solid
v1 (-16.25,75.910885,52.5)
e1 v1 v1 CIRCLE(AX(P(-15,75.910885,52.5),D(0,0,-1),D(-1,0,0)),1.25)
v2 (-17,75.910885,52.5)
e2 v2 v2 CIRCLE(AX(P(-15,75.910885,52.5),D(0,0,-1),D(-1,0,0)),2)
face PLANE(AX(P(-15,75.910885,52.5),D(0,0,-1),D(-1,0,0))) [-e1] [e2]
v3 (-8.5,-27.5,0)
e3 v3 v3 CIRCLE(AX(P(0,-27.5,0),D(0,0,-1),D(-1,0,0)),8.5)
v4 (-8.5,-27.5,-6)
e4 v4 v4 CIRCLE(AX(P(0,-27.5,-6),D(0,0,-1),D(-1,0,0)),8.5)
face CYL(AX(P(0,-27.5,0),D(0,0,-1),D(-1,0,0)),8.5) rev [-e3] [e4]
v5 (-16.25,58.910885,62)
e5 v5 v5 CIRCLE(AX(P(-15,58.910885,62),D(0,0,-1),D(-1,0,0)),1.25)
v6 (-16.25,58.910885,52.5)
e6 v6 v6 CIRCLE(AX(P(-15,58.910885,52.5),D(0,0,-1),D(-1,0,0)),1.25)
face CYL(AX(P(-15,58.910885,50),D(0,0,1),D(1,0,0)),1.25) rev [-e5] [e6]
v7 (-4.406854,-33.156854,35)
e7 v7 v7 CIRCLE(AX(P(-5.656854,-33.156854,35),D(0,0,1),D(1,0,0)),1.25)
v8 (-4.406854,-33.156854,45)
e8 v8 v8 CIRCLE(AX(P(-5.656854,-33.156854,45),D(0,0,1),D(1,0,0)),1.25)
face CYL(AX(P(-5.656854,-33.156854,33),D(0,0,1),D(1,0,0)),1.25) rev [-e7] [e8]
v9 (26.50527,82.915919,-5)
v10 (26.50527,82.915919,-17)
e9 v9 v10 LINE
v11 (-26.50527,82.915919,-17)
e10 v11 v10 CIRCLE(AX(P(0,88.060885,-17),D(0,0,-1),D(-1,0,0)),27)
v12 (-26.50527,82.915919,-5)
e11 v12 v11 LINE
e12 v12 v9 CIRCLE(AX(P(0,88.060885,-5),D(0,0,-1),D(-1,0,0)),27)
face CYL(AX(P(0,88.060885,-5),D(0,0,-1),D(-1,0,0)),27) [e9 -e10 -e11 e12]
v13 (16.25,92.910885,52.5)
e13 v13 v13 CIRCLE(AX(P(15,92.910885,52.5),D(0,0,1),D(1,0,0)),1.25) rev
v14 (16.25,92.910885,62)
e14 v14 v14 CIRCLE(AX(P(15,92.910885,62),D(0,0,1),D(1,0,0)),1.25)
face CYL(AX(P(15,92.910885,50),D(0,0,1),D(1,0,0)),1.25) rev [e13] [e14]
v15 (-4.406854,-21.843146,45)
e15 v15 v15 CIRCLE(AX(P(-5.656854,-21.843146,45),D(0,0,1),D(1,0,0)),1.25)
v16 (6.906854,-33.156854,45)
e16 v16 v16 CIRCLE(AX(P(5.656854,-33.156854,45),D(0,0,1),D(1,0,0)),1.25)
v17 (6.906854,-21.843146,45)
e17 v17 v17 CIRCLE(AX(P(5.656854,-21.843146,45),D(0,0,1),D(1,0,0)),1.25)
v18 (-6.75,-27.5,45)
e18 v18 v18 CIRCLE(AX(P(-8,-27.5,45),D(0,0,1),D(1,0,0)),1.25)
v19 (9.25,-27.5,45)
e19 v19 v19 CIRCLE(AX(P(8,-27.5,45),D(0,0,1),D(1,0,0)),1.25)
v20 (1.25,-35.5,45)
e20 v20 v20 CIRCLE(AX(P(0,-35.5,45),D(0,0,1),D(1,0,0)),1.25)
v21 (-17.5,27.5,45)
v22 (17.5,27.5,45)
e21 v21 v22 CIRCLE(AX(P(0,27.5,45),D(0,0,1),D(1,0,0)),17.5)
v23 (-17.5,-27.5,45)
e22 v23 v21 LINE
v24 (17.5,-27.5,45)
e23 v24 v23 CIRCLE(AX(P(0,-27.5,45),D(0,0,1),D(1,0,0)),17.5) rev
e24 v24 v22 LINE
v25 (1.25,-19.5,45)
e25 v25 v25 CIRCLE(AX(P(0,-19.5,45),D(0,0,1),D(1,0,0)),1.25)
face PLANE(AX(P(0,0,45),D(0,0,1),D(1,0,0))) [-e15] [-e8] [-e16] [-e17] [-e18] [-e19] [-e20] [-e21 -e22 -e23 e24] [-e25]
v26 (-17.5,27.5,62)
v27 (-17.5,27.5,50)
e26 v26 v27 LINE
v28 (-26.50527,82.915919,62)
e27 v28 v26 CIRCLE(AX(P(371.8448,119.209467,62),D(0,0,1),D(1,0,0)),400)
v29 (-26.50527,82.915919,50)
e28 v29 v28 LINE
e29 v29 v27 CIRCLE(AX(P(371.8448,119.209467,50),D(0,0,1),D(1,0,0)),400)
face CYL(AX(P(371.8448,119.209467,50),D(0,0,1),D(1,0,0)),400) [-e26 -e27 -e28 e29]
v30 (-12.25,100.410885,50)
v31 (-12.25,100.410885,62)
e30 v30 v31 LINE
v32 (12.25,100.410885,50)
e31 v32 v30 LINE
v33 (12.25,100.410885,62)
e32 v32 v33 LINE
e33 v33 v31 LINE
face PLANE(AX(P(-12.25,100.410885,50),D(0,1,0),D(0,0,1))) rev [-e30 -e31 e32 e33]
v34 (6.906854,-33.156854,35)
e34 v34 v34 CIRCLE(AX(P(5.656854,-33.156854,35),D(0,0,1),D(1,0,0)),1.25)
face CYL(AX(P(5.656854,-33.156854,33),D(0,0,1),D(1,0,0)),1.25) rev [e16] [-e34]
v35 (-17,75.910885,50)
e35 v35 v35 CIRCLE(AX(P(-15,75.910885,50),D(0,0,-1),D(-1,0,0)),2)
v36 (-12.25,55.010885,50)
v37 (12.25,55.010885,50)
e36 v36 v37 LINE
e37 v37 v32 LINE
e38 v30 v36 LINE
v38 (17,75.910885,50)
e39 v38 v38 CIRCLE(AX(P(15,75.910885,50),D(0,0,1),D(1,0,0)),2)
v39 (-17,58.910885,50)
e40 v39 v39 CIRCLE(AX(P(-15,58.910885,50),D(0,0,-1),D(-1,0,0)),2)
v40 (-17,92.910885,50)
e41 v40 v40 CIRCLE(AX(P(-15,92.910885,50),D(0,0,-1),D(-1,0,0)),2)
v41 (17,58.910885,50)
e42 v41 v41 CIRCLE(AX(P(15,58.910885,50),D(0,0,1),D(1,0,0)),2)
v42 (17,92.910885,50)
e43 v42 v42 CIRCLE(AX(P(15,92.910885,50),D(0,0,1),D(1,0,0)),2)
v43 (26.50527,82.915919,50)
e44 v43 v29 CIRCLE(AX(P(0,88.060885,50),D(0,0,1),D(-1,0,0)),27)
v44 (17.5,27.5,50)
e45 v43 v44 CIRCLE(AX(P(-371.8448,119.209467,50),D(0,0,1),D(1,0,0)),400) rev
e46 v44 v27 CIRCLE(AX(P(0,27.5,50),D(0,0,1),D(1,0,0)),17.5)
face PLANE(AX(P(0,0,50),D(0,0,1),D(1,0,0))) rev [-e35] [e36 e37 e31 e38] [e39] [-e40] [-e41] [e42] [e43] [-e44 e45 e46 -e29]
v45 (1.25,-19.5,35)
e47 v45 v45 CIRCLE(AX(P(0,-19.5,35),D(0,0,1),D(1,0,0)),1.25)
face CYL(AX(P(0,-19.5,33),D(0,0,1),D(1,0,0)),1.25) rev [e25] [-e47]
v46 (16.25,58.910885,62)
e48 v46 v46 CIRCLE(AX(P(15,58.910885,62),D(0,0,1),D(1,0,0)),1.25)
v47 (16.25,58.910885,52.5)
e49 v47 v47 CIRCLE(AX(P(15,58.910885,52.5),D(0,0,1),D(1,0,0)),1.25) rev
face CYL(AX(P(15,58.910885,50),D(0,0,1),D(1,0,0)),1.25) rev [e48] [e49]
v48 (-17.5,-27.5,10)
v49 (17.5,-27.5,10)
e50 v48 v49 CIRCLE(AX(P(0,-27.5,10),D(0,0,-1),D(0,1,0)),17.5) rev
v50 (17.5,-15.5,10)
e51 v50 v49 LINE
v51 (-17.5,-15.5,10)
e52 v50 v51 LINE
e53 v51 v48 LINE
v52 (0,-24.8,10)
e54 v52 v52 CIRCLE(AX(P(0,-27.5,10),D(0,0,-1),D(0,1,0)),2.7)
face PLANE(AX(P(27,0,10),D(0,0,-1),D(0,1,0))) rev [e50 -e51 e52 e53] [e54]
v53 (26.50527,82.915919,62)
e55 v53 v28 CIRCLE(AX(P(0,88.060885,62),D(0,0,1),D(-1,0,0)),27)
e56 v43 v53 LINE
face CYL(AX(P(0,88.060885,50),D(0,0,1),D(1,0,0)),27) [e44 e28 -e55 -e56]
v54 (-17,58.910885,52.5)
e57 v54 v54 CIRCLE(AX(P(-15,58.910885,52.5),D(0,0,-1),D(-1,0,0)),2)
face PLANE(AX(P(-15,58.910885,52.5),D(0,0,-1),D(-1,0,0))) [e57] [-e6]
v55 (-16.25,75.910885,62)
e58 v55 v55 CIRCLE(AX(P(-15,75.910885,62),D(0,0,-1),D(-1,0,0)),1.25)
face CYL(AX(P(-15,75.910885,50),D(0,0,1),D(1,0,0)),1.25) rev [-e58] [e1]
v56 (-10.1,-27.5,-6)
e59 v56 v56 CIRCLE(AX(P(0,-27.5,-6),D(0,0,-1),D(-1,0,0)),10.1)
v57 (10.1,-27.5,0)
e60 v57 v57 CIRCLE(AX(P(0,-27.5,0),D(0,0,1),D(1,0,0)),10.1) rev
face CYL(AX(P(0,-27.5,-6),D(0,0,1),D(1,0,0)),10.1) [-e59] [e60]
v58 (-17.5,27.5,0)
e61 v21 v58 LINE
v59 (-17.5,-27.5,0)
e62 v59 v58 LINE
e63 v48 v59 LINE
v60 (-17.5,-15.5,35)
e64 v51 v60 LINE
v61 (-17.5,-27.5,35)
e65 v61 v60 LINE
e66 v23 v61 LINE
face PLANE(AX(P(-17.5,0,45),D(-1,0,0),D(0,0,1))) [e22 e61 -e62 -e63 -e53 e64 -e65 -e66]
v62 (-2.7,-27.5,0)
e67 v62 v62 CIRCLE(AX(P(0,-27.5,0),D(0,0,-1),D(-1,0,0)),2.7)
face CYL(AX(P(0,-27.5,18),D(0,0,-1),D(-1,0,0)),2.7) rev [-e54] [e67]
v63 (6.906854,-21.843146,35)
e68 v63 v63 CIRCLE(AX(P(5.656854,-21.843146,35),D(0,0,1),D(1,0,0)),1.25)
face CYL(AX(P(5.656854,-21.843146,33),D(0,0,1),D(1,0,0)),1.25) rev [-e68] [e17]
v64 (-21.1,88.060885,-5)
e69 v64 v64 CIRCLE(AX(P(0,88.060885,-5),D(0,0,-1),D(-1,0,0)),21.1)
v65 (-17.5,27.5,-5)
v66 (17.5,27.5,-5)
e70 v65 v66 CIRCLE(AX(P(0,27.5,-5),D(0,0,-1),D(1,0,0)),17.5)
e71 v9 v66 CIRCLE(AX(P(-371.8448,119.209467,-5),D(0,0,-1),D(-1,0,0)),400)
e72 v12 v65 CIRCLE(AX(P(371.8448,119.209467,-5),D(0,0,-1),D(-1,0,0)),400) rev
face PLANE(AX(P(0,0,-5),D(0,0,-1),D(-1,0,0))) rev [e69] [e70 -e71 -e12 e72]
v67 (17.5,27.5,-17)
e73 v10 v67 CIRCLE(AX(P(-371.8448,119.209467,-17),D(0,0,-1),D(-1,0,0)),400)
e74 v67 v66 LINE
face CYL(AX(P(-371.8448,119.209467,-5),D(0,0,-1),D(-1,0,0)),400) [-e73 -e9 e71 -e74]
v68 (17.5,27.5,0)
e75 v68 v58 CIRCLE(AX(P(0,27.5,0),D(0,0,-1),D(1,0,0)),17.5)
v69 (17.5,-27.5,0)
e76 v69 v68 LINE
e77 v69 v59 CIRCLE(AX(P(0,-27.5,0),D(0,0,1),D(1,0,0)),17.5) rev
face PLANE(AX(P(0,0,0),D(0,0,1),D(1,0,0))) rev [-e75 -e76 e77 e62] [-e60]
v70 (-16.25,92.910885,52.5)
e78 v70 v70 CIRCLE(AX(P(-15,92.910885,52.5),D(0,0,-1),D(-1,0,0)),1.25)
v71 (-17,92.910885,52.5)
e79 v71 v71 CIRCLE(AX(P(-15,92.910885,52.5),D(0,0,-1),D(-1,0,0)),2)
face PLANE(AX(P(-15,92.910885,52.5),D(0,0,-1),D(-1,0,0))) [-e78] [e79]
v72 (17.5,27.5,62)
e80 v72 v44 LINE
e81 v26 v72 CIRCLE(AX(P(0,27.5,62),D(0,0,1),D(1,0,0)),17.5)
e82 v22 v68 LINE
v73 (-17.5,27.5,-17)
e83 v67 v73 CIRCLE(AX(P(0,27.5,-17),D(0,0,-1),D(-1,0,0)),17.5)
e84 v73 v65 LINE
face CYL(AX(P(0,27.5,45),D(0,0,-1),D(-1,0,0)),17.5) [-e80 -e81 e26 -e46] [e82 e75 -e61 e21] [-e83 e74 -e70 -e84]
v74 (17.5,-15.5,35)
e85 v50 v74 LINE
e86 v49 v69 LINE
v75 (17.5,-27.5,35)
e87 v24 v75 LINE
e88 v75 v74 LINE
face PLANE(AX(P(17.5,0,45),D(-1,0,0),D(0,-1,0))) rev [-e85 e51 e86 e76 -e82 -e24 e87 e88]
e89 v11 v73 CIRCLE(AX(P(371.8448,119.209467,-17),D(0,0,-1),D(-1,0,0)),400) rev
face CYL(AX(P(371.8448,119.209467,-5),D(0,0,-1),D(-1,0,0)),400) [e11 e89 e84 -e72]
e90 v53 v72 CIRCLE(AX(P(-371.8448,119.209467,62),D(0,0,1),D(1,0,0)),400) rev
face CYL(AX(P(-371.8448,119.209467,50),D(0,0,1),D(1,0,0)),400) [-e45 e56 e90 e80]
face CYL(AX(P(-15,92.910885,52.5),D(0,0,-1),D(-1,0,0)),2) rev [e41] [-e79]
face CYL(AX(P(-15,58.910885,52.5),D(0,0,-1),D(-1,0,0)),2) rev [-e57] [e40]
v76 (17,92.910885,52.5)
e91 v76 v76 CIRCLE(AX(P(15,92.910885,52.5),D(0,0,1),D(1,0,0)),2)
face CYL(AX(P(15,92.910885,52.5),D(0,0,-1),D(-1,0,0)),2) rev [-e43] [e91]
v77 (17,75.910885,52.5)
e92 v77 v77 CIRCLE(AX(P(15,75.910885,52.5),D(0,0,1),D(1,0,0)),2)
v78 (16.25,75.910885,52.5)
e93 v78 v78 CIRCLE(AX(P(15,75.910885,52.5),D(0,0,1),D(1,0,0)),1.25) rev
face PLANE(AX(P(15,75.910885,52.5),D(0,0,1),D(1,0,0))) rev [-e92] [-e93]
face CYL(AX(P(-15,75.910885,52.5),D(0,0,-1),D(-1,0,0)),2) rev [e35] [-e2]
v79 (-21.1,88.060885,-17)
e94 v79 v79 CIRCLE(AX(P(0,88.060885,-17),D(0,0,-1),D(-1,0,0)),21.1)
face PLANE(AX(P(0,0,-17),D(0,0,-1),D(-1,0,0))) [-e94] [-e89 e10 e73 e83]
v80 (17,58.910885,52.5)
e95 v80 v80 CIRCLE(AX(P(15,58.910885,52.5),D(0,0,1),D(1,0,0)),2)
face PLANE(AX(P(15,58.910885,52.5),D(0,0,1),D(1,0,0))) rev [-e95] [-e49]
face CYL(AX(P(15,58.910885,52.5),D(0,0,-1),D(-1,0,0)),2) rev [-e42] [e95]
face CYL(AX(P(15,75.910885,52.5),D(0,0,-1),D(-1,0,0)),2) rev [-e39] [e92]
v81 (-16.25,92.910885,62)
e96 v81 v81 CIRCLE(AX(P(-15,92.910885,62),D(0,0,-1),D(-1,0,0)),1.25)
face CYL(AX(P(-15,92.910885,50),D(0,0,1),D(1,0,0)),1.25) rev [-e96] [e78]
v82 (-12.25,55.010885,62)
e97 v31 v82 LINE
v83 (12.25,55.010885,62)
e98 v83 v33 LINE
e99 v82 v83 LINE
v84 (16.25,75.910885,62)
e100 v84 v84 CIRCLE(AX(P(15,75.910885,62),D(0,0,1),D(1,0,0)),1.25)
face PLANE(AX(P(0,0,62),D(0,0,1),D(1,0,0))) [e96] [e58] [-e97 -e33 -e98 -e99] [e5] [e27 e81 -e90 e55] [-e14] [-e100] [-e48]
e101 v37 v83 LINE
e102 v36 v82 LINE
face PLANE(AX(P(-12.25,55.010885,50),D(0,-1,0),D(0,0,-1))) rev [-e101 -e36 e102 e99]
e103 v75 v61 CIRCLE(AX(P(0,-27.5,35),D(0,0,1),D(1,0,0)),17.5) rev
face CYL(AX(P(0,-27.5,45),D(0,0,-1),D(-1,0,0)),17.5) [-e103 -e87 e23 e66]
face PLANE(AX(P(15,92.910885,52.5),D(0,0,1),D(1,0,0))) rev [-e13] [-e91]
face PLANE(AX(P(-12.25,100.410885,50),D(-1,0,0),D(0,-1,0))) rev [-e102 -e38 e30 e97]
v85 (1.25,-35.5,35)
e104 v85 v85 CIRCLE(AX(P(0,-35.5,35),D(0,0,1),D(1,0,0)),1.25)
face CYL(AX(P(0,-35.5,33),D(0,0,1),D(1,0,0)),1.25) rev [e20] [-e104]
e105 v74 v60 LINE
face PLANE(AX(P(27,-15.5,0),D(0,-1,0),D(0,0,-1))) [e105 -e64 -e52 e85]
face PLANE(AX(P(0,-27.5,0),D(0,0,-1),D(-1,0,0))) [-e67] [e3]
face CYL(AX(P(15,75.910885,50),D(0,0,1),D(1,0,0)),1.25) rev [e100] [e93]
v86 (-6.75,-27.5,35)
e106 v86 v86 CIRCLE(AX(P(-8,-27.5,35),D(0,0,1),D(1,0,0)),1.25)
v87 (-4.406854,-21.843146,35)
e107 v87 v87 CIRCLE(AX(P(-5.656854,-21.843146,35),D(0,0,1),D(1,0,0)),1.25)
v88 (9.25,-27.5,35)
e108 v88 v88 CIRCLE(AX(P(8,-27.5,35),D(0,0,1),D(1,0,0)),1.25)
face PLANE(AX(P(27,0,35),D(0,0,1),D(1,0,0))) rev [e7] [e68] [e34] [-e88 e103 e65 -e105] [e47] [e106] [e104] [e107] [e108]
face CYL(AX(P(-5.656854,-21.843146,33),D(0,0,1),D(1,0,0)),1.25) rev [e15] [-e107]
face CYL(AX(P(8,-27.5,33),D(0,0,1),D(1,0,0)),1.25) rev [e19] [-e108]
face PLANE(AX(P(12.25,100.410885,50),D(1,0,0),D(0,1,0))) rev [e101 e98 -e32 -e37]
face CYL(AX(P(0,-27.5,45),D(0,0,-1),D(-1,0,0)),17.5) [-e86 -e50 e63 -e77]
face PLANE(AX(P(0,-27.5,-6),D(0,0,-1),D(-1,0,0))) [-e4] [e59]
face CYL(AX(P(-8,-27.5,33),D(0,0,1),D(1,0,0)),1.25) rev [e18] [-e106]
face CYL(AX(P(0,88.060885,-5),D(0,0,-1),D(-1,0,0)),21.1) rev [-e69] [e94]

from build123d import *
from build123d.topology import SkipClean

# Parameters (mm, degrees)
BOSS_EXTRUDE1_DEPTH  = 45
BOSS_EXTRUDE2_DEPTH  = 5
BOSS_EXTRUDE3_DEPTH  = 12
BOSS_EXTRUDE4_START  = 5
BOSS_EXTRUDE4_DEPTH  = 5
BOSS_EXTRUDE5_START  = 12
BOSS_EXTRUDE5_DEPTH  = 12
BOSS_EXTRUDE6_START  = -12
BOSS_EXTRUDE6_DEPTH  = 12
BOSS_EXTRUDE7_DEPTH  = 12
CUT_EXTRUDE3_DEPTH   = 12
SKETCH15_R           = 21.100000000000012
CUT_EXTRUDE4_DEPTH   = 12
CUT_EXTRUDE5_DEPTH   = 139.06975520310718
SKETCH21_R           = 1.2500000000000013
SKETCH21_R_2         = 1.2500000000000016
SKETCH21_R_3         = 1.2500000000000036
SKETCH21_R_4         = 1.2500000000000064
SKETCH21_R_5         = 1.2500000000000004
SKETCH21_R_6         = 1.250000000000002
CUT_EXTRUDE7_DEPTH   = 12
SKETCH23_R           = 10.100000000000001
BOSS_EXTRUDE8_DEPTH  = 6
SKETCH24_R           = 8.5
CUT_EXTRUDE8_DEPTH   = 6
SKETCH25_R           = 2.7
CUT_EXTRUDE9_DEPTH   = 18
BOSS_EXTRUDE9_START  = -12
BOSS_EXTRUDE9_DEPTH  = 12
SKETCH30_R           = 1.2500000000000013
CUT_EXTRUDE11_DEPTH  = 12
SKETCH31_R           = 2.0000000000000036
SKETCH31_R_2         = 2.0000000000000067
SKETCH31_R_3         = 2
CUT_EXTRUDE12_DEPTH  = 2.5
BOSS_EXTRUDE11_DEPTH = 12


with BuildPart() as part:
    # Sketch2 → Boss-Extrude1 (new body)
    with BuildSketch(Plane.XY):
        with BuildLine():
            Line((-17.5, 27.5), (-17.5, -27.5))
            ThreePointArc((-17.5, -27.500000000000004), (3.74e-15, -45), (17.500000000000007, -27.5))
            Line((17.500000000000007, -27.5), (17.5, 27.5))
            ThreePointArc((17.5, 27.500000000000004), (7e-16, 45), (-17.5, 27.5))
        make_face()
    extrude(amount=BOSS_EXTRUDE1_DEPTH)

    # Sketch5 → Boss-Extrude2 (add)
    with BuildSketch(Plane.XY.offset(45)):
        with BuildLine():
            ThreePointArc((17.5, 27.5), (1.07e-15, 45), (-17.5, 27.5))
            ThreePointArc((-17.5, 27.5), (-3.21e-15, 10), (17.5, 27.5))
        make_face()
    extrude(amount=BOSS_EXTRUDE2_DEPTH)

    # Sketch6 → Boss-Extrude3 (add)
    with BuildSketch(Plane.XY.offset(49.99999999999999)):
        with BuildLine():
            Line((17.5, 27.5), (17.499999999999996, 67.5))
            ThreePointArc((17.499999999999996, 67.5), (-1.59e-15, 85), (-17.500000000000004, 67.5))
            Line((-17.5, 67.5), (-17.5, 27.5))
            ThreePointArc((-17.5, 27.5), (1.8e-16, 10.000000000000004), (17.5, 27.500000000000004))
        make_face()
    extrude(amount=BOSS_EXTRUDE3_DEPTH)

    # Sketch7 → Boss-Extrude4 (add)
    with BuildSketch(Plane(origin=(0, 0, 0), x_dir=(-1, 0, 0), z_dir=(0, 0, -1)).offset(BOSS_EXTRUDE4_START)):
        with BuildLine():
            ThreePointArc((17.5, 27.5), (1.07e-15, 10), (-17.5, 27.5))
            ThreePointArc((-17.5, 27.5), (1.07e-15, 45), (17.5, 27.5))
        make_face()
    extrude(amount=-BOSS_EXTRUDE4_DEPTH)

    # Sketch8 → Boss-Extrude5 (add)
    with BuildSketch(Plane(origin=(0, 0, -5), x_dir=(-1, 0, 0), z_dir=(0, 0, -1)).offset(BOSS_EXTRUDE5_START)):
        with BuildLine():
            Line((-17.499999999999996, 67.5), (-17.5, 27.5))
            ThreePointArc((-17.5, 27.5), (-1.96e-15, 10), (17.5, 27.499999999999996))
            Line((17.5, 27.5), (17.5, 67.5))
            ThreePointArc((17.5, 67.5), (1.96e-15, 85), (-17.5, 67.5))
        make_face()
    extrude(amount=-BOSS_EXTRUDE5_DEPTH)

    # Sketch11 → Boss-Extrude6 (add)
    with BuildSketch(Plane.XY.offset(62).offset(BOSS_EXTRUDE6_START)):
        with BuildLine():
            Line((-17.5, 67.5), (-17.5, 27.5))
            ThreePointArc((-17.5, 27.5), (-3.21e-15, 10), (17.5, 27.5))
            Line((17.5, 27.5), (17.499999999999996, 67.5))
            ThreePointArc((17.499999999999996, 67.5), (-6.69e-15, 115.06088519495209), (-17.5, 67.5))
        make_face()
    extrude(amount=BOSS_EXTRUDE6_DEPTH)

    # Sketch12 → Boss-Extrude7 (add)
    with BuildSketch(Plane(origin=(0, 0, -17), x_dir=(-1, 0, 0), z_dir=(0, 0, -1))):
        with BuildLine():
            ThreePointArc((17.5, 67.5), (-2.61e-15, 115.06088519495209), (-17.499999999999996, 67.5))
            ThreePointArc((-17.499999999999996, 67.5), (2.81e-15, 85), (17.5, 67.5))
        make_face()
    extrude(amount=-BOSS_EXTRUDE7_DEPTH)

    # Sketch14 → Cut-Extrude3 (cut)
    with BuildSketch(Plane.XY.offset(62)):
        Polygon((-12.25, 100.41088519495209), (12.25, 100.41088519495209), (12.250000000000004, 55.01088519495209), (-12.249999999999996, 55.01088519495209), align=None)
    extrude(amount=-CUT_EXTRUDE3_DEPTH, mode=Mode.SUBTRACT)

    # Sketch15 → Cut-Extrude4 (cut)
    with BuildSketch(Plane(origin=(0, 0, -17), x_dir=(-1, 0, 0), z_dir=(0, 0, -1))):
        with Locations((1.73e-15, 88.06088519495209)):
            Circle(SKETCH15_R)
    extrude(amount=-CUT_EXTRUDE4_DEPTH, mode=Mode.SUBTRACT)

    # Sketch17 → Cut-Extrude5 (cut, through all)
    with SkipClean():  # the faces are left unmerged after this step: merging them gives an invalid solid
        with BuildSketch(Plane.ZY.offset(17.5)):
            Polygon((9.999999999999995, -15.499999999999993), (9.999999999999998, -45.00000000000001), (34.99999999999999, -45.00000000000001), (34.99999999999999, -27.499999999999993), (34.99999999999999, -15.499999999999993), align=None)
        extrude(amount=-CUT_EXTRUDE5_DEPTH, mode=Mode.SUBTRACT)

    # Sketch21 → Cut-Extrude7 (cut)
    with SkipClean():  # the faces are left unmerged after this step: merging them gives an invalid solid
        with BuildSketch(Plane.XY.offset(45)):
            with Locations((8, -27.5)):
                Circle(SKETCH21_R)
            with Locations((5.656854249492371, -33.15685424949239)):
                Circle(SKETCH21_R_2)
            with Locations((-2.776e-14, -35.50000000000001)):
                Circle(SKETCH21_R_3)
            with Locations((-5.656854249492409, -33.15685424949234)):
                Circle(SKETCH21_R_4)
            with Locations((-8.000000000000002, -27.499999999999943)):
                Circle(SKETCH21_R_2)
            with Locations((-5.656854249492327, -21.84314575050757)):
                Circle(SKETCH21_R_3)
            with Locations((8.327e-14, -19.5)):
                Circle(SKETCH21_R_5)
            with Locations((5.656854249492453, -21.843145750507688)):
                Circle(SKETCH21_R_6)
        extrude(amount=-CUT_EXTRUDE7_DEPTH, mode=Mode.SUBTRACT)

    # Sketch23 → Boss-Extrude8 (add)
    with SkipClean():  # the faces are left unmerged after this step: merging them gives an invalid solid
        with BuildSketch(Plane(origin=(0, 0, 0), x_dir=(-1, 0, 0), z_dir=(0, 0, -1))):
            with Locations((0, -27.5)):
                Circle(SKETCH23_R)
        extrude(amount=BOSS_EXTRUDE8_DEPTH)

    # Sketch24 → Cut-Extrude8 (cut)
    with SkipClean():  # the faces are left unmerged after this step: merging them gives an invalid solid
        with BuildSketch(Plane(origin=(0, 0, -6), x_dir=(-1, 0, 0), z_dir=(0, 0, -1))):
            with Locations((0, -27.5)):
                Circle(SKETCH24_R)
        extrude(amount=-CUT_EXTRUDE8_DEPTH, mode=Mode.SUBTRACT)

    # Sketch25 → Cut-Extrude9 (cut)
    with SkipClean():  # the faces are left unmerged after this step: merging them gives an invalid solid
        with BuildSketch(Plane(origin=(0, 0, 0), x_dir=(-1, 0, 0), z_dir=(0, 0, -1))):
            with Locations((0, -27.5)):
                Circle(SKETCH25_R)
        extrude(amount=-CUT_EXTRUDE9_DEPTH, mode=Mode.SUBTRACT)

    # Sketch26 → Boss-Extrude9 (add)
    with SkipClean():  # the faces are left unmerged after this step: merging them gives an invalid solid
        with BuildSketch(Plane.XY.offset(62).offset(BOSS_EXTRUDE9_START)):
            with BuildLine():
                ThreePointArc((-17.500000000000004, 67.50000000000001), (-23.313699366711795, 74.4420959007974), (-26.505269682203256, 82.91591881278035))
                ThreePointArc((-26.505269682203163, 82.91591881278036), (-22.976087168602874, 55.04977019073297), (-17.499999999999943, 27.5))
                Line((-17.5, 27.5), (-17.5, 67.5))
            make_face()
            with BuildLine():
                ThreePointArc((17.500000000000114, 27.5), (22.97608716860276, 55.049770190732346), (26.50526968220305, 82.9159188127791))
                ThreePointArc((26.50526968220299, 82.9159188127791), (23.313699366711454, 74.44209590079687), (17.499999999999986, 67.50000000000001))
                Line((17.499999999999996, 67.5), (17.5, 27.5))
            make_face()
        extrude(amount=BOSS_EXTRUDE9_DEPTH)

    # Sketch30 → Cut-Extrude11 (cut)
    with SkipClean():  # the faces are left unmerged after this step: merging them gives an invalid solid
        with BuildSketch(Plane.XY.offset(62)):
            with Locations((15.000000000000004, 92.91088519495209)):
                Circle(SKETCH30_R)
            with Locations((15.00000000000018, 75.91088519495207)):
                Circle(SKETCH30_R)
            with Locations((15.000000000000357, 58.91088519495208)):
                Circle(SKETCH30_R)
            with Locations((-15, 92.91088519495209)):
                Circle(SKETCH30_R)
            with Locations((-15.000000000000172, 75.91088519495207)):
                Circle(SKETCH30_R)
            with Locations((-15.000000000000343, 58.91088519495207)):
                Circle(SKETCH30_R)
        extrude(amount=-CUT_EXTRUDE11_DEPTH, mode=Mode.SUBTRACT)

    # Sketch31 → Cut-Extrude12 (cut)
    with SkipClean():  # the faces are left unmerged after this step: merging them gives an invalid solid
        with BuildSketch(Plane(origin=(0, 0, 49.99999999999999), x_dir=(-1, 0, 0), z_dir=(0, 0, -1))):
            with Locations((15, 92.91088519495209)):
                Circle(SKETCH31_R)
            with Locations((15.000000000000176, 75.91088519495207)):
                Circle(SKETCH31_R_2)
            with Locations((15.000000000000353, 58.91088519495208)):
                Circle(SKETCH31_R)
            with Locations((-15.00000000000034, 58.91088519495207)):
                Circle(SKETCH31_R_3)
            with Locations((-15.000000000000169, 75.91088519495207)):
                Circle(SKETCH31_R_3)
            with Locations((-14.999999999999996, 92.91088519495209)):
                Circle(SKETCH31_R_3)
        extrude(amount=-CUT_EXTRUDE12_DEPTH, mode=Mode.SUBTRACT)

    # Sketch32 → Boss-Extrude11 (add)
    with BuildSketch(Plane(origin=(0, 0, -17), x_dir=(-1, 0, 0), z_dir=(0, 0, -1))):
        with BuildLine():
            ThreePointArc((-17.500000000000014, 67.50000000000001), (-23.313699366709606, 74.44209590079366), (-26.505269682201586, 82.91591881277179))
            ThreePointArc((-26.505269682201458, 82.91591881277179), (-22.976087168599463, 55.049770190729106), (-17.5, 27.5))
            Line((-17.5, 27.5), (-17.499999999999996, 67.5))
        make_face()
        with BuildLine():
            ThreePointArc((17.499999999999943, 27.500000000000014), (22.976087168602476, 55.04977019073189), (26.50526968220288, 82.91591881277813))
            ThreePointArc((26.505269682202822, 82.91591881277813), (23.313699366711223, 74.44209590079643), (17.5, 67.5))
            Line((17.5, 67.5), (17.5, 27.5))
        make_face()
    extrude(amount=-BOSS_EXTRUDE11_DEPTH)


solid = part.part
